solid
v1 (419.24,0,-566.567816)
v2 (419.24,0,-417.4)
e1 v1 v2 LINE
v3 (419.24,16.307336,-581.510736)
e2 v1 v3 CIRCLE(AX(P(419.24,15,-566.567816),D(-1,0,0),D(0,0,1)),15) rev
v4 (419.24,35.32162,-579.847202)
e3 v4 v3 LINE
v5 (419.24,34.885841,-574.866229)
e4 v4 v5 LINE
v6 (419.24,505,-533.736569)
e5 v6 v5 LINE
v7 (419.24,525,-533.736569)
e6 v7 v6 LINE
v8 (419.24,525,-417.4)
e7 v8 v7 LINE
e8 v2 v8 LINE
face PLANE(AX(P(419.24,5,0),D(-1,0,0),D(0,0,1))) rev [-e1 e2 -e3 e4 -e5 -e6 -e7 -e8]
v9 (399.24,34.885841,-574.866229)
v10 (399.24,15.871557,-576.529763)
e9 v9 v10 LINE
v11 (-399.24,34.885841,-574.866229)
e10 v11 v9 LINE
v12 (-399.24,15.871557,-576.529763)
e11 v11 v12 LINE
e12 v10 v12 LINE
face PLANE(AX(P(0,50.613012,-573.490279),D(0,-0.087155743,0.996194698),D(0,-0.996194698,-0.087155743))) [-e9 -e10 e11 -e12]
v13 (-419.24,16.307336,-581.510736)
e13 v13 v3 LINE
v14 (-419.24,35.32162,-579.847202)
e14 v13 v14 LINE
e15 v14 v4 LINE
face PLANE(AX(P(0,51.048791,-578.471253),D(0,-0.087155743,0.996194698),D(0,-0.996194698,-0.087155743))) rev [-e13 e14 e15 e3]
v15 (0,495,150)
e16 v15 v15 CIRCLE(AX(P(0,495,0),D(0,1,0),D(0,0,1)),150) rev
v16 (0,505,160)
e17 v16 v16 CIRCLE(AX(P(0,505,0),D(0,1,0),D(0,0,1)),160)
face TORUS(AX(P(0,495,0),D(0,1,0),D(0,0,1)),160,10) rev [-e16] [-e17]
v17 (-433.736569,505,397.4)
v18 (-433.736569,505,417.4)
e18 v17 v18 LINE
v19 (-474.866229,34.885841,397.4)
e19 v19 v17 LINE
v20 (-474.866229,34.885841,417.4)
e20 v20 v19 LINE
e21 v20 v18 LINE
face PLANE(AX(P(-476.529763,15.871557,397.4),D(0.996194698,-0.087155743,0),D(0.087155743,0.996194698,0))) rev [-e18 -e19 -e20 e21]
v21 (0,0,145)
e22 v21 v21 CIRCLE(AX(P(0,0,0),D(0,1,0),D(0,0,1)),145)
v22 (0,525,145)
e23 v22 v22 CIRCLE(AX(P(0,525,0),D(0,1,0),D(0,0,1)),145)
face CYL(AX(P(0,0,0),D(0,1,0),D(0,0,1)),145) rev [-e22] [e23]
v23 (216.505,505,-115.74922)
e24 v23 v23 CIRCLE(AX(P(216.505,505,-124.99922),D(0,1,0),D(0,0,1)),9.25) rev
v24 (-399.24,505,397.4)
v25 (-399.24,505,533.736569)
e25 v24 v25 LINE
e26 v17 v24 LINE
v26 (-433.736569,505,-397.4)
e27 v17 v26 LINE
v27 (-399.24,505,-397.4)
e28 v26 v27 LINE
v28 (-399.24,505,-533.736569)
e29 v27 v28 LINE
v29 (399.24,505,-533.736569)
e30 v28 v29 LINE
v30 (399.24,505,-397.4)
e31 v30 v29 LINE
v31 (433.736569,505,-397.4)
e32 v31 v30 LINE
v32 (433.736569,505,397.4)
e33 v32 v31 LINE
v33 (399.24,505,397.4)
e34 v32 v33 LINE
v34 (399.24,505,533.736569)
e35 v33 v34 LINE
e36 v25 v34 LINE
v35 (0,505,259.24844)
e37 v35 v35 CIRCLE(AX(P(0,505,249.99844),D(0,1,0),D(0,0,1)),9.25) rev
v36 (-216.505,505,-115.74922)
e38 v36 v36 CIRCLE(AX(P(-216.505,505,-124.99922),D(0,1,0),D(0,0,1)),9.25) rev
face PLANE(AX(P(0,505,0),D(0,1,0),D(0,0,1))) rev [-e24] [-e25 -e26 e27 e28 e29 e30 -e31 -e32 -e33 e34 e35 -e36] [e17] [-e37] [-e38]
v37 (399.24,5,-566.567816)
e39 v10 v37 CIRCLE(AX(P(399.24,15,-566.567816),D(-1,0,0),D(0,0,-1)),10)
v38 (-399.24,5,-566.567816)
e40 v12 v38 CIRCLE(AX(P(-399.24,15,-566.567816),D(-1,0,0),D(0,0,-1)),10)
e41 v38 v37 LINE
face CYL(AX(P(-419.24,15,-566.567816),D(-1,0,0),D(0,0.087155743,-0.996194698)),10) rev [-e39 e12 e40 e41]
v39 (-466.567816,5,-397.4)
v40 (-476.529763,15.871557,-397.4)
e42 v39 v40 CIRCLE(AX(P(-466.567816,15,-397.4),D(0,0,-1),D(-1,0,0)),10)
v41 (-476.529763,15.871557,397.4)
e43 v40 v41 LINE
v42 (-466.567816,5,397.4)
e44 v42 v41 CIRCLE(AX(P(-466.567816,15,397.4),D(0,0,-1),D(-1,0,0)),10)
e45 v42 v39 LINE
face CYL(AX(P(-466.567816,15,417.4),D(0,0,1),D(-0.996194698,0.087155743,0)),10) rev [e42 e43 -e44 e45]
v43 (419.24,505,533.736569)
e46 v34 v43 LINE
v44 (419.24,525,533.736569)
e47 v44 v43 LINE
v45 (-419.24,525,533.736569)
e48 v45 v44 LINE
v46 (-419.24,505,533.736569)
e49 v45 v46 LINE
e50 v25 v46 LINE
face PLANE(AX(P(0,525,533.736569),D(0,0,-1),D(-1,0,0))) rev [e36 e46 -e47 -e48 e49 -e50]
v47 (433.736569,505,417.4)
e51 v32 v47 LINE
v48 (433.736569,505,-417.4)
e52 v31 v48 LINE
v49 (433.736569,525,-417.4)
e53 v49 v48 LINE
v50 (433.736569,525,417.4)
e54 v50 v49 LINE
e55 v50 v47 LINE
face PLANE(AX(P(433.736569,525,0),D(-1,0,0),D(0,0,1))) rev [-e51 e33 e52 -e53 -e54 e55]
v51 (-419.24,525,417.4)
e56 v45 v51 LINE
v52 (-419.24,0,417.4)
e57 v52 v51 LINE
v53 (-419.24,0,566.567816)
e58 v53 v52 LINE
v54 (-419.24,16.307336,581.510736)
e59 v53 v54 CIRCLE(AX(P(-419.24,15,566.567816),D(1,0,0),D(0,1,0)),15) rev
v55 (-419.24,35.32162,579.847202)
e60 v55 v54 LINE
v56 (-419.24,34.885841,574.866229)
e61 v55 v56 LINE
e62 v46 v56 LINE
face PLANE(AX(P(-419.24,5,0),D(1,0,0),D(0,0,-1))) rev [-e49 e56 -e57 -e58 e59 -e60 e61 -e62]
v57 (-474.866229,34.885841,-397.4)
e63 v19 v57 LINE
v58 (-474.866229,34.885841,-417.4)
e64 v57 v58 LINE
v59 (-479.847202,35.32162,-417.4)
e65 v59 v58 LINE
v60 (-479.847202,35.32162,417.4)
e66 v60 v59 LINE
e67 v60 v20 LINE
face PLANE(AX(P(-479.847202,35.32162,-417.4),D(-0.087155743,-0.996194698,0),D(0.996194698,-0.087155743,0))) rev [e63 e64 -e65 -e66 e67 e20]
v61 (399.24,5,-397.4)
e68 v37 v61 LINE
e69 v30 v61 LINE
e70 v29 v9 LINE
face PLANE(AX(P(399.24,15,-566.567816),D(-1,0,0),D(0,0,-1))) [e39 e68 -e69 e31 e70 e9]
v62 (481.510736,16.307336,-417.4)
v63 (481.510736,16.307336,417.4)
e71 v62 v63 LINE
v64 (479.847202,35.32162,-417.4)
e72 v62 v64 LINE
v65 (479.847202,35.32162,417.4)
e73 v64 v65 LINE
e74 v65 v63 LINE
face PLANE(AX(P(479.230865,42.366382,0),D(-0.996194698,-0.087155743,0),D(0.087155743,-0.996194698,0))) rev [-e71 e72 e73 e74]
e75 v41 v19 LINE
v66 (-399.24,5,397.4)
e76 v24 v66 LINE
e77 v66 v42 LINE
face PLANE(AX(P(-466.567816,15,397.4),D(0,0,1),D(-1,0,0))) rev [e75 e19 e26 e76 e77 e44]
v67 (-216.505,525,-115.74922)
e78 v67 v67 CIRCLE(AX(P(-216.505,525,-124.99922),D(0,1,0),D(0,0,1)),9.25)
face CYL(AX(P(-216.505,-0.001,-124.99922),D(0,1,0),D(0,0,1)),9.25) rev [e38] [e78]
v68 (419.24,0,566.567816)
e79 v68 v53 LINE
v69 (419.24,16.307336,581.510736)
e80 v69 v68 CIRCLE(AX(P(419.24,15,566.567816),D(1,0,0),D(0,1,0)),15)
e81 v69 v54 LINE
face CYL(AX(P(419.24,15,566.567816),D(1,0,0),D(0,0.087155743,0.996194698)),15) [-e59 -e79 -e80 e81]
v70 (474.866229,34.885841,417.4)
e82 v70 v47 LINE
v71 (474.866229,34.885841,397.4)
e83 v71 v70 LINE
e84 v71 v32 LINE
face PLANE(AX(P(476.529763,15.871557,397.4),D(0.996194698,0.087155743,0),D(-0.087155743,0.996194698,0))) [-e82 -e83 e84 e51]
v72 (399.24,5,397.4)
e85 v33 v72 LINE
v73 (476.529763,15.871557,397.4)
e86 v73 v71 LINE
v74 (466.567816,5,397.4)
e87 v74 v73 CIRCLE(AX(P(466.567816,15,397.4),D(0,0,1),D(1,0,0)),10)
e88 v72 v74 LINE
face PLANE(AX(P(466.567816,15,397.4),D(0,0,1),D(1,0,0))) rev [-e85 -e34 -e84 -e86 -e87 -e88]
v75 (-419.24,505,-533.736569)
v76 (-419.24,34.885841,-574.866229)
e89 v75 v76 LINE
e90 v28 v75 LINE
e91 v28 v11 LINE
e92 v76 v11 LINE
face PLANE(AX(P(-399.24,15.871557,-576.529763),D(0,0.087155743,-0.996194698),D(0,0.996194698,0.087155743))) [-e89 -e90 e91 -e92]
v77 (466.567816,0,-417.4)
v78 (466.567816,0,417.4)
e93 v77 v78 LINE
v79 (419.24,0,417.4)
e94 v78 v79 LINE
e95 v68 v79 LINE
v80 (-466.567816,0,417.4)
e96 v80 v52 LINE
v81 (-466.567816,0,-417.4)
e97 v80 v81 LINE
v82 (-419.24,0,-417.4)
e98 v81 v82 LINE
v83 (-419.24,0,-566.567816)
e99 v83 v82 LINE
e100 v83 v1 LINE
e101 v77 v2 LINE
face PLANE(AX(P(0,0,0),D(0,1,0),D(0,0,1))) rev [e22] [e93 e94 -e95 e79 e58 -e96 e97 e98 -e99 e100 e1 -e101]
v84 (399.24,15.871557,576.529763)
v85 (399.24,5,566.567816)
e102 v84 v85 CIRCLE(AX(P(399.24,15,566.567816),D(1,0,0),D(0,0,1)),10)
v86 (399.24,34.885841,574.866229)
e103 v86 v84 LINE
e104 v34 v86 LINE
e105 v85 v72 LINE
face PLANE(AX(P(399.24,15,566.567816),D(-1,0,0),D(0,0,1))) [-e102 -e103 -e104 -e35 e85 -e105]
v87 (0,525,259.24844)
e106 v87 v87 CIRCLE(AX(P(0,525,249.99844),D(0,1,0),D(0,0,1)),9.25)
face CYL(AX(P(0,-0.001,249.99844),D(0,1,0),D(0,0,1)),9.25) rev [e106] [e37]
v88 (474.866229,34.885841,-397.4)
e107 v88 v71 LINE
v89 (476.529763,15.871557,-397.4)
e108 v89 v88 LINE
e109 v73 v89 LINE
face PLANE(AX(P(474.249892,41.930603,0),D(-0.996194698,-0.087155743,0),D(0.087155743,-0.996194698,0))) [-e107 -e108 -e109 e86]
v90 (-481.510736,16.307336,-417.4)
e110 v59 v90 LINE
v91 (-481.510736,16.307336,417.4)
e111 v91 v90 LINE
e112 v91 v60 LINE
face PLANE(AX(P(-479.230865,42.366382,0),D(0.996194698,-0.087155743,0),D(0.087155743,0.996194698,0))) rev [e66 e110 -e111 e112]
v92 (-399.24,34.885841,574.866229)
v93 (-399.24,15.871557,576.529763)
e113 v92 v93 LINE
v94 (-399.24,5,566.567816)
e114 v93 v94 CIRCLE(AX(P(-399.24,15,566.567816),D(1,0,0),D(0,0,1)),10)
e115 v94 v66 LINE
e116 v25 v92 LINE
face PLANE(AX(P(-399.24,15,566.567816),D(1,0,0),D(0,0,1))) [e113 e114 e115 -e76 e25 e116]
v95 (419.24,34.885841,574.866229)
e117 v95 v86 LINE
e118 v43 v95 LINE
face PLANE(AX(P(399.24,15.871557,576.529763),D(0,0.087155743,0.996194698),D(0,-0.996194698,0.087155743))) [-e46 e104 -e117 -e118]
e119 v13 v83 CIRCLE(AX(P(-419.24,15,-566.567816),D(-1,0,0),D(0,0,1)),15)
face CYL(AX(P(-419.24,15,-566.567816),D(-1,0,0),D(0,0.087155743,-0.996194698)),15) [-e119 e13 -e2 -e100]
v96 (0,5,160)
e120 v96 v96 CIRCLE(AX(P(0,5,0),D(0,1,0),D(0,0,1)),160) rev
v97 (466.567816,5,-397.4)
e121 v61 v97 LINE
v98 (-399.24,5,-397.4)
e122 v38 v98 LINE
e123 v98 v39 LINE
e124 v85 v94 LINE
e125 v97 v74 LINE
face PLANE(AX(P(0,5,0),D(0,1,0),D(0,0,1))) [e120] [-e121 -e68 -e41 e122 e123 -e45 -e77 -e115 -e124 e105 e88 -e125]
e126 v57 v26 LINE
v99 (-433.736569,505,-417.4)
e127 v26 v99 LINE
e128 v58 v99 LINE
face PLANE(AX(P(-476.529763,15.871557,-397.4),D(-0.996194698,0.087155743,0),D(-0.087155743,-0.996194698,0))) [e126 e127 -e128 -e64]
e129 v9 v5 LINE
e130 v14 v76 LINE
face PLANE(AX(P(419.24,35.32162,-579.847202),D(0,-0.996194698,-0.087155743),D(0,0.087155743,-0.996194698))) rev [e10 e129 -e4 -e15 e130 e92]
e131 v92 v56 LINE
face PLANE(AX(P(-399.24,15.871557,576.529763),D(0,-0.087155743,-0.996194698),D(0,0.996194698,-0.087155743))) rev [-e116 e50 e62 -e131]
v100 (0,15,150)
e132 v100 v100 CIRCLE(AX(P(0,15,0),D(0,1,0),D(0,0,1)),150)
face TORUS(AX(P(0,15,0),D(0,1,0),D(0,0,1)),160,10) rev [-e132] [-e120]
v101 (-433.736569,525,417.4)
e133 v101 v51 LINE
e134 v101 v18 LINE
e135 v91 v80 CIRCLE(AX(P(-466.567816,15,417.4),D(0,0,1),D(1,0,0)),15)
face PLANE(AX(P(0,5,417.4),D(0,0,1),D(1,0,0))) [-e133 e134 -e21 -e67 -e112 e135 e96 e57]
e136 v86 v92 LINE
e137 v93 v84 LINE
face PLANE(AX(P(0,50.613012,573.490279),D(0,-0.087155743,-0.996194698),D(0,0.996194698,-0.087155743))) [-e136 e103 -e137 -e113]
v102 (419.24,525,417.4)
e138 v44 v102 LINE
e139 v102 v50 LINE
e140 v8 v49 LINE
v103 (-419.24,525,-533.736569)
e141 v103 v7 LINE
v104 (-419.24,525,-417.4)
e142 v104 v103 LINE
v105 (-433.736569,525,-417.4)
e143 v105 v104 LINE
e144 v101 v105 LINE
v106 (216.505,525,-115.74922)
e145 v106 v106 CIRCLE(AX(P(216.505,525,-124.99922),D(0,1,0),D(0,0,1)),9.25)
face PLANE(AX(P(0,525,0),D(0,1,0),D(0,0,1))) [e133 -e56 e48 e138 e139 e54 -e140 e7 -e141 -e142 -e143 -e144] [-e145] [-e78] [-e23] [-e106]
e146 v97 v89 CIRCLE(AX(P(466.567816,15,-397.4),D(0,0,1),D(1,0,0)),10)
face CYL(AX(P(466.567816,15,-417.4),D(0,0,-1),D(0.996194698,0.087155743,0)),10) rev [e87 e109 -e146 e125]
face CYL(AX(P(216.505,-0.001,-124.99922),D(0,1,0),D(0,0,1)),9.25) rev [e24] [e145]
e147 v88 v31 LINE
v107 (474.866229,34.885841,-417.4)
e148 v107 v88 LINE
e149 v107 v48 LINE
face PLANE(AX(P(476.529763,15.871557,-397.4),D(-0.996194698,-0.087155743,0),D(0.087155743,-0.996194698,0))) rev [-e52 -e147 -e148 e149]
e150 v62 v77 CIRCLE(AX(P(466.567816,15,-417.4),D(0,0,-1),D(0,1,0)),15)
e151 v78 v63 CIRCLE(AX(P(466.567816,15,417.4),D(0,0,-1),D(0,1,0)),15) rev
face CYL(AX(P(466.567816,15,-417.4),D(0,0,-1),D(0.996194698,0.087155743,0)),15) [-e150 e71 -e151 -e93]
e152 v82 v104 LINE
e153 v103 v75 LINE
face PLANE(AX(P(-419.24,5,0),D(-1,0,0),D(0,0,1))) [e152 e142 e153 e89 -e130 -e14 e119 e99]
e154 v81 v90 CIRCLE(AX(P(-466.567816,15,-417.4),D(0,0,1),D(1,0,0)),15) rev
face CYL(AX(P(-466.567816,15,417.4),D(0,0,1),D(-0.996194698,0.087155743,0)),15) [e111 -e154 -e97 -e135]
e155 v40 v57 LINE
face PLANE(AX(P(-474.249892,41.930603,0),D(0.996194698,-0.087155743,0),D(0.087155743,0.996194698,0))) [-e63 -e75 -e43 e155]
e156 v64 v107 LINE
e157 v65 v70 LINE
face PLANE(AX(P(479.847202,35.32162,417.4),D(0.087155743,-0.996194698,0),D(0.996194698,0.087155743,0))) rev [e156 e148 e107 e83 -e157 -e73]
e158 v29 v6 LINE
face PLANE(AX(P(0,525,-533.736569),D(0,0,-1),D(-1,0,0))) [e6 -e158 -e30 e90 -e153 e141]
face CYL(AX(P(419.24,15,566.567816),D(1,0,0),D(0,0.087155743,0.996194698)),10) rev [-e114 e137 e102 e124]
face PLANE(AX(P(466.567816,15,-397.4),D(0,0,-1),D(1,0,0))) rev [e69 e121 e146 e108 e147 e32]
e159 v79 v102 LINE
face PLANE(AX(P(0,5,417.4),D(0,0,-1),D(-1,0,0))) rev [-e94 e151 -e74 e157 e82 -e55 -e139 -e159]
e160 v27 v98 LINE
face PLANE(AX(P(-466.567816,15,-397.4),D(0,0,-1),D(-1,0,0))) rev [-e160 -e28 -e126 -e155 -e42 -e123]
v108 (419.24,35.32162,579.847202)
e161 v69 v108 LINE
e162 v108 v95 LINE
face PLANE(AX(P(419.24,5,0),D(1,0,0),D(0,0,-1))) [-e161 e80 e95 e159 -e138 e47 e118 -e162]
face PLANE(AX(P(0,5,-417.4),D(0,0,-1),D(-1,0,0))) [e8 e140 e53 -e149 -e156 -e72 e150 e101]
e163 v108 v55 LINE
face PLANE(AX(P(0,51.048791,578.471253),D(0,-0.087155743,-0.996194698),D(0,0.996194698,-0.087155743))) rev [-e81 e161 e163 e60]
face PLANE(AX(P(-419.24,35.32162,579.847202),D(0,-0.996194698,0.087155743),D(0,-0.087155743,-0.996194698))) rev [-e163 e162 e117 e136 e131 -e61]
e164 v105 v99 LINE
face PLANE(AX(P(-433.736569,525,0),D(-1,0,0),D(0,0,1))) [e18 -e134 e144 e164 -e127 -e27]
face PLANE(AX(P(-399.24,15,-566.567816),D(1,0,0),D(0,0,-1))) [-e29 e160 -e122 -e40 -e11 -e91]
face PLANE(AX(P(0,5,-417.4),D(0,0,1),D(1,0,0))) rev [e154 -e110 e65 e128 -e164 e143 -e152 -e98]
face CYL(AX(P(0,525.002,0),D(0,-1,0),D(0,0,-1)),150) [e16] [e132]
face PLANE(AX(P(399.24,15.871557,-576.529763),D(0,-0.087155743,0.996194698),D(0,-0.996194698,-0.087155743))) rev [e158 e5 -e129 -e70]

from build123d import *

# Parameters (mm, degrees)
BOSS_EXTRUDE1_DEPTH  = 5
EDGE_FLANGE1_START   = -417.4
EDGE_FLANGE1_DEPTH   = 834.8
EDGE_FLANGE1_START_2 = -419.24
EDGE_FLANGE1_2_DEPTH = 838.48
EDGE_FLANGE1_3_DEPTH = 834.8
EDGE_FLANGE1_4_DEPTH = 838.48
BOSS_EXTRUDE2_START  = -20
BOSS_EXTRUDE2_DEPTH  = 20
BOSS_EXTRUDE6_START  = -20
BOSS_EXTRUDE6_DEPTH  = 20
MIRROR2_START        = -20
MIRROR2_COPY_1_DEPTH = 20
MIRROR2_COPY_2_DEPTH = 20
BOSS_EXTRUDE7_DEPTH  = 20
CUT_EXTRUDE1_REACH   = 921.649
SKETCH21_R           = 9.25
BOSS_EXTRUDE8_REACH  = 918.804
SKETCH22_R           = 150
SKETCH23_R           = 145
CUT_EXTRUDE2_DEPTH   = 920.648675088
FILLET1_R            = 10


# Read off the part's stored shape, not the designer's step: Edge-Flange1
with BuildPart() as part:
    # Sketch1 → Boss-Extrude1 (new body)
    with BuildSketch(Plane(origin=(0, 0, 0), x_dir=(1, 0, 0), z_dir=(0, 1, 0))):
        Polygon((-419.24, -417.4), (-419.24, -582.5), (419.24, -582.5), (419.24, -417.4), (482.5, -417.4), (482.5, 417.4), (419.24, 417.4), (419.24, 582.5), (-419.24, 582.5), (-419.24, 417.4), (-482.5, 417.4), (-482.5, -417.4), align=None)
    extrude(amount=BOSS_EXTRUDE1_DEPTH)

    # Edge-Flange1 outline → Edge-Flange1 (add)
    with BuildSketch(Plane.XY.offset(EDGE_FLANGE1_START)):
        with BuildLine():
            Line((-479.84720202, 35.321619656), (-481.510736273, 16.307336141))
            ThreePointArc((-481.510736273, 16.307336141), (-480.800529715, 10.26398325), (-477.748155652, 4.999999958))
            Line((-477.748155652, 4.999999958), (-466.567815802, 5))
            ThreePointArc((-466.567815802, 5), (-473.94058917, 8.244097924), (-476.529762783, 15.871557427))
            Line((-476.529762783, 15.871557427), (-474.86622853, 34.885840943))
            Line((-474.86622853, 34.885840943), (-479.84720202, 35.321619656))
        make_face()
        with BuildLine():
            ThreePointArc((476.529762783, 15.871557427), (473.94058917, 8.244097924), (466.567815802, 5))
            Line((466.567815802, 5), (477.748155652, 4.999999958))
            ThreePointArc((477.748155652, 4.999999958), (480.800529715, 10.26398325), (481.510736273, 16.307336141))
            Line((481.510736273, 16.307336141), (479.84720202, 35.321619656))
            Line((479.84720202, 35.321619656), (474.86622853, 34.885840943))
            Line((474.86622853, 34.885840943), (476.529762783, 15.871557427))
        make_face()
    extrude(amount=EDGE_FLANGE1_DEPTH)

    # Edge-Flange1 2 outline → Edge-Flange1 2 (add)
    with BuildSketch(Plane.YZ.offset(EDGE_FLANGE1_START_2)):
        with BuildLine():
            Line((35.321619656, 579.84720202), (16.307336141, 581.510736273))
            ThreePointArc((16.307336141, 581.510736273), (10.263983245, 580.800529713), (4.99999995, 577.748155645))
            Line((4.99999995, 577.748155645), (5, 566.567815802))
            ThreePointArc((5, 566.567815802), (8.244097924, 573.94058917), (15.871557427, 576.529762783))
            Line((15.871557427, 576.529762783), (34.885840943, 574.86622853))
            Line((34.885840943, 574.86622853), (35.321619656, 579.84720202))
        make_face()
        with BuildLine():
            ThreePointArc((15.871557427, -576.529762783), (8.244097924, -573.94058917), (5, -566.567815802))
            Line((5, -566.567815802), (4.99999995, -577.748155645))
            ThreePointArc((4.99999995, -577.748155645), (10.263983245, -580.800529713), (16.307336141, -581.510736273))
            Line((16.307336141, -581.510736273), (35.321619656, -579.84720202))
            Line((35.321619656, -579.84720202), (34.885840943, -574.86622853))
            Line((34.885840943, -574.86622853), (15.871557427, -576.529762783))
        make_face()
    extrude(amount=EDGE_FLANGE1_2_DEPTH)

    # Edge-Flange1 3 outline → Edge-Flange1 3 (cut)
    with BuildSketch(Plane.XY.offset(EDGE_FLANGE1_START)):
        with BuildLine():
            ThreePointArc((-466.567815802, 0), (-472.691540133, 1.306936051), (-477.748155652, 4.999999958))
            Line((-477.748155652, 4.999999958), (-483, 4.999999958))
            Line((-483, 4.999999958), (-483, -2.2e-08))
            Line((-483, -2.2e-08), (-466.567815802, 0))
        make_face()
        with BuildLine():
            ThreePointArc((477.748155652, 4.999999958), (472.691540133, 1.306936051), (466.567815802, 0))
            Line((466.567815802, 0), (483, -2.2e-08))
            Line((483, -2.2e-08), (483, 4.999999958))
            Line((483, 4.999999958), (477.748155652, 4.999999958))
        make_face()
    extrude(amount=EDGE_FLANGE1_3_DEPTH, mode=Mode.SUBTRACT)

    # Edge-Flange1 4 outline → Edge-Flange1 4 (cut)
    with BuildSketch(Plane.YZ.offset(EDGE_FLANGE1_START_2)):
        with BuildLine():
            ThreePointArc((0, 566.567815802), (1.306936049, 572.691540128), (4.99999995, 577.748155645))
            Line((4.99999995, 577.748155645), (4.99999995, 583))
            Line((4.99999995, 583), (-2.7e-08, 583))
            Line((-2.7e-08, 583), (0, 566.567815802))
        make_face()
        with BuildLine():
            ThreePointArc((4.99999995, -577.748155645), (1.306936049, -572.691540128), (0, -566.567815802))
            Line((0, -566.567815802), (-2.7e-08, -583))
            Line((-2.7e-08, -583), (4.99999995, -583))
            Line((4.99999995, -583), (4.99999995, -577.748155645))
        make_face()
    extrude(amount=EDGE_FLANGE1_4_DEPTH, mode=Mode.SUBTRACT)

    # Sketch18 → Boss-Extrude2 (add)
    with BuildSketch(Plane(origin=(419.24, 0, 0), x_dir=(0, 0, -1), z_dir=(1, 0, 0)).offset(BOSS_EXTRUDE2_START)):
        with BuildLine():
            Line((-417.4, 5), (-566.567815802, 5))
            ThreePointArc((-566.567815802, 5), (-573.94058917, 8.244097924), (-576.529762783, 15.871557427))
            Line((-576.529762783, 15.871557427), (-533.736569049, 505))
            Line((-533.736569049, 505), (-417.4, 505))
            Line((-417.4, 505), (-417.4, 5))
        make_face()
    boss_extrude2 = extrude(amount=BOSS_EXTRUDE2_DEPTH)

    # Sketch19 → Boss-Extrude6 (add)
    with BuildSketch(Plane.XY.offset(417.4).offset(BOSS_EXTRUDE6_START)):
        with BuildLine():
            Line((466.567815802, 5), (419.24, 5))
            Line((419.24, 5), (399.24, 5))
            Line((399.24, 5), (399.24, 505))
            Line((399.24, 505), (419.24, 505))
            Line((419.24, 505), (433.736569049, 505))
            Line((433.736569049, 505), (476.529762783, 15.871557427))
            ThreePointArc((476.529762783, 15.871557427), (473.94058917, 8.244097924), (466.567815802, 5))
        make_face()
    boss_extrude6 = extrude(amount=BOSS_EXTRUDE6_DEPTH)

    # Mirror1: Boss-Extrude2, Boss-Extrude6 across plane
    add(boss_extrude2.mirror(Plane.XY))
    add(boss_extrude6.mirror(Plane.XY))

    # Mirror2: Boss-Extrude2, Boss-Extrude6 across plane
    add(boss_extrude2.mirror(Plane(origin=(0, 0, 0), x_dir=(0, 0, 1), z_dir=(1, 0, 0))))
    add(boss_extrude6.mirror(Plane(origin=(0, 0, 0), x_dir=(0, 0, 1), z_dir=(1, 0, 0))))

    # Mirror2 copy 1 sketch → Mirror2 copy 1 (add)
    with BuildSketch(Plane.ZY.offset(419.24).offset(MIRROR2_START)):
        with BuildLine():
            Line((-417.4, 5), (-566.567815802, 5))
            ThreePointArc((-566.567815802, 5), (-573.94058917, 8.244097924), (-576.529762783, 15.871557427))
            Line((-576.529762783, 15.871557427), (-533.736569049, 505))
            Line((-533.736569049, 505), (-417.4, 505))
            Line((-417.4, 505), (-417.4, 5))
        make_face()
    extrude(amount=MIRROR2_COPY_1_DEPTH)

    # Mirror2 copy 2 sketch → Mirror2 copy 2 (add)
    with BuildSketch(Plane(origin=(0, 0, -417.4), x_dir=(-1, 0, 0), z_dir=(0, 0, -1)).offset(MIRROR2_START)):
        with BuildLine():
            Line((466.567815802, 5), (419.24, 5))
            Line((419.24, 5), (399.24, 5))
            Line((399.24, 5), (399.24, 505))
            Line((399.24, 505), (419.24, 505))
            Line((419.24, 505), (433.736569049, 505))
            Line((433.736569049, 505), (476.529762783, 15.871557427))
            ThreePointArc((476.529762783, 15.871557427), (473.94058917, 8.244097924), (466.567815802, 5))
        make_face()
    extrude(amount=MIRROR2_COPY_2_DEPTH)

    # Sketch20 → Boss-Extrude7 (add)
    with BuildSketch(Plane(origin=(0, 505, 0), x_dir=(1, 0, 0), z_dir=(0, 1, 0))):
        Polygon((-419.24, -417.4), (-419.24, -533.736569049), (419.24, -533.736569049), (419.24, -417.4), (433.736569049, -417.4), (433.736569049, 417.4), (419.24, 417.4), (419.24, 533.736569049), (-419.24, 533.736569049), (-419.24, 417.4), (-433.736569049, 417.4), (-433.736569049, -417.4), align=None)
    extrude(amount=BOSS_EXTRUDE7_DEPTH)

    # Sketch21 → Cut-Extrude1 (cut, up to next)
    with BuildSketch(Plane(origin=(0, 525, 0), x_dir=(1, 0, 0), z_dir=(0, 1, 0)), mode=Mode.PRIVATE) as cut_extrude1_sk1:
        with Locations(Location((0, -249.998440062, 0), (0, 0, 270))):
            Circle(SKETCH21_R)
    cut_extrude1_tool1 = extrude(cut_extrude1_sk1.sketch, amount=-CUT_EXTRUDE1_REACH, mode=Mode.PRIVATE) & part.part
    # Sketch21 → Cut-Extrude1 (cut, up to next)
    with BuildSketch(Plane(origin=(0, 525, 0), x_dir=(1, 0, 0), z_dir=(0, 1, 0)), mode=Mode.PRIVATE) as cut_extrude1_sk2:
        with Locations(Location((-216.505, 124.999220031, 0), (0, 0, 270))):
            Circle(SKETCH21_R)
    cut_extrude1_tool2 = extrude(cut_extrude1_sk2.sketch, amount=-CUT_EXTRUDE1_REACH, mode=Mode.PRIVATE) & part.part
    # Sketch21 → Cut-Extrude1 (cut, up to next)
    with BuildSketch(Plane(origin=(0, 525, 0), x_dir=(1, 0, 0), z_dir=(0, 1, 0)), mode=Mode.PRIVATE) as cut_extrude1_sk3:
        with Locations(Location((216.505, 124.999220031, 0), (0, 0, 270))):
            Circle(SKETCH21_R)
    cut_extrude1_tool3 = extrude(cut_extrude1_sk3.sketch, amount=-CUT_EXTRUDE1_REACH, mode=Mode.PRIVATE) & part.part
    add(cut_extrude1_tool1.solids().sort_by_distance((0, 525, 249.99844))[0], mode=Mode.SUBTRACT)
    add(cut_extrude1_tool2.solids().sort_by_distance((-216.505, 525, -124.99922))[0], mode=Mode.SUBTRACT)
    add(cut_extrude1_tool3.solids().sort_by_distance((216.505, 525, -124.99922))[0], mode=Mode.SUBTRACT)

    # Sketch22 → Boss-Extrude8 (add, up to next)
    with BuildSketch(Plane(origin=(0, 5, 0), x_dir=(1, 0, 0), z_dir=(0, 1, 0)), mode=Mode.PRIVATE) as boss_extrude8_sk1:
        with Locations(Location((0, 0, 0), (0, 0, 270))):
            Circle(SKETCH22_R)
    boss_extrude8_tool1 = extrude(boss_extrude8_sk1.sketch, amount=BOSS_EXTRUDE8_REACH, mode=Mode.PRIVATE) - part.part
    add(boss_extrude8_tool1.solids().sort_by_distance((0, 5, 0))[0])

    # Sketch23 → Cut-Extrude2 (cut, through all)
    with BuildSketch(Plane(origin=(0, 525, 0), x_dir=(1, 0, 0), z_dir=(0, 1, 0))):
        with Locations(Location((0, 0, 0), (0, 0, 270))):
            Circle(SKETCH23_R)
    extrude(amount=-CUT_EXTRUDE2_DEPTH, mode=Mode.SUBTRACT)

    # Fillet1
    fillet1_edges = [part.edges().sort_by_distance(p)[0] for p in [
        (0, 505, -150),
        (0, 5, -150),
    ]]
    fillet(fillet1_edges, radius=FILLET1_R)


solid = part.part
